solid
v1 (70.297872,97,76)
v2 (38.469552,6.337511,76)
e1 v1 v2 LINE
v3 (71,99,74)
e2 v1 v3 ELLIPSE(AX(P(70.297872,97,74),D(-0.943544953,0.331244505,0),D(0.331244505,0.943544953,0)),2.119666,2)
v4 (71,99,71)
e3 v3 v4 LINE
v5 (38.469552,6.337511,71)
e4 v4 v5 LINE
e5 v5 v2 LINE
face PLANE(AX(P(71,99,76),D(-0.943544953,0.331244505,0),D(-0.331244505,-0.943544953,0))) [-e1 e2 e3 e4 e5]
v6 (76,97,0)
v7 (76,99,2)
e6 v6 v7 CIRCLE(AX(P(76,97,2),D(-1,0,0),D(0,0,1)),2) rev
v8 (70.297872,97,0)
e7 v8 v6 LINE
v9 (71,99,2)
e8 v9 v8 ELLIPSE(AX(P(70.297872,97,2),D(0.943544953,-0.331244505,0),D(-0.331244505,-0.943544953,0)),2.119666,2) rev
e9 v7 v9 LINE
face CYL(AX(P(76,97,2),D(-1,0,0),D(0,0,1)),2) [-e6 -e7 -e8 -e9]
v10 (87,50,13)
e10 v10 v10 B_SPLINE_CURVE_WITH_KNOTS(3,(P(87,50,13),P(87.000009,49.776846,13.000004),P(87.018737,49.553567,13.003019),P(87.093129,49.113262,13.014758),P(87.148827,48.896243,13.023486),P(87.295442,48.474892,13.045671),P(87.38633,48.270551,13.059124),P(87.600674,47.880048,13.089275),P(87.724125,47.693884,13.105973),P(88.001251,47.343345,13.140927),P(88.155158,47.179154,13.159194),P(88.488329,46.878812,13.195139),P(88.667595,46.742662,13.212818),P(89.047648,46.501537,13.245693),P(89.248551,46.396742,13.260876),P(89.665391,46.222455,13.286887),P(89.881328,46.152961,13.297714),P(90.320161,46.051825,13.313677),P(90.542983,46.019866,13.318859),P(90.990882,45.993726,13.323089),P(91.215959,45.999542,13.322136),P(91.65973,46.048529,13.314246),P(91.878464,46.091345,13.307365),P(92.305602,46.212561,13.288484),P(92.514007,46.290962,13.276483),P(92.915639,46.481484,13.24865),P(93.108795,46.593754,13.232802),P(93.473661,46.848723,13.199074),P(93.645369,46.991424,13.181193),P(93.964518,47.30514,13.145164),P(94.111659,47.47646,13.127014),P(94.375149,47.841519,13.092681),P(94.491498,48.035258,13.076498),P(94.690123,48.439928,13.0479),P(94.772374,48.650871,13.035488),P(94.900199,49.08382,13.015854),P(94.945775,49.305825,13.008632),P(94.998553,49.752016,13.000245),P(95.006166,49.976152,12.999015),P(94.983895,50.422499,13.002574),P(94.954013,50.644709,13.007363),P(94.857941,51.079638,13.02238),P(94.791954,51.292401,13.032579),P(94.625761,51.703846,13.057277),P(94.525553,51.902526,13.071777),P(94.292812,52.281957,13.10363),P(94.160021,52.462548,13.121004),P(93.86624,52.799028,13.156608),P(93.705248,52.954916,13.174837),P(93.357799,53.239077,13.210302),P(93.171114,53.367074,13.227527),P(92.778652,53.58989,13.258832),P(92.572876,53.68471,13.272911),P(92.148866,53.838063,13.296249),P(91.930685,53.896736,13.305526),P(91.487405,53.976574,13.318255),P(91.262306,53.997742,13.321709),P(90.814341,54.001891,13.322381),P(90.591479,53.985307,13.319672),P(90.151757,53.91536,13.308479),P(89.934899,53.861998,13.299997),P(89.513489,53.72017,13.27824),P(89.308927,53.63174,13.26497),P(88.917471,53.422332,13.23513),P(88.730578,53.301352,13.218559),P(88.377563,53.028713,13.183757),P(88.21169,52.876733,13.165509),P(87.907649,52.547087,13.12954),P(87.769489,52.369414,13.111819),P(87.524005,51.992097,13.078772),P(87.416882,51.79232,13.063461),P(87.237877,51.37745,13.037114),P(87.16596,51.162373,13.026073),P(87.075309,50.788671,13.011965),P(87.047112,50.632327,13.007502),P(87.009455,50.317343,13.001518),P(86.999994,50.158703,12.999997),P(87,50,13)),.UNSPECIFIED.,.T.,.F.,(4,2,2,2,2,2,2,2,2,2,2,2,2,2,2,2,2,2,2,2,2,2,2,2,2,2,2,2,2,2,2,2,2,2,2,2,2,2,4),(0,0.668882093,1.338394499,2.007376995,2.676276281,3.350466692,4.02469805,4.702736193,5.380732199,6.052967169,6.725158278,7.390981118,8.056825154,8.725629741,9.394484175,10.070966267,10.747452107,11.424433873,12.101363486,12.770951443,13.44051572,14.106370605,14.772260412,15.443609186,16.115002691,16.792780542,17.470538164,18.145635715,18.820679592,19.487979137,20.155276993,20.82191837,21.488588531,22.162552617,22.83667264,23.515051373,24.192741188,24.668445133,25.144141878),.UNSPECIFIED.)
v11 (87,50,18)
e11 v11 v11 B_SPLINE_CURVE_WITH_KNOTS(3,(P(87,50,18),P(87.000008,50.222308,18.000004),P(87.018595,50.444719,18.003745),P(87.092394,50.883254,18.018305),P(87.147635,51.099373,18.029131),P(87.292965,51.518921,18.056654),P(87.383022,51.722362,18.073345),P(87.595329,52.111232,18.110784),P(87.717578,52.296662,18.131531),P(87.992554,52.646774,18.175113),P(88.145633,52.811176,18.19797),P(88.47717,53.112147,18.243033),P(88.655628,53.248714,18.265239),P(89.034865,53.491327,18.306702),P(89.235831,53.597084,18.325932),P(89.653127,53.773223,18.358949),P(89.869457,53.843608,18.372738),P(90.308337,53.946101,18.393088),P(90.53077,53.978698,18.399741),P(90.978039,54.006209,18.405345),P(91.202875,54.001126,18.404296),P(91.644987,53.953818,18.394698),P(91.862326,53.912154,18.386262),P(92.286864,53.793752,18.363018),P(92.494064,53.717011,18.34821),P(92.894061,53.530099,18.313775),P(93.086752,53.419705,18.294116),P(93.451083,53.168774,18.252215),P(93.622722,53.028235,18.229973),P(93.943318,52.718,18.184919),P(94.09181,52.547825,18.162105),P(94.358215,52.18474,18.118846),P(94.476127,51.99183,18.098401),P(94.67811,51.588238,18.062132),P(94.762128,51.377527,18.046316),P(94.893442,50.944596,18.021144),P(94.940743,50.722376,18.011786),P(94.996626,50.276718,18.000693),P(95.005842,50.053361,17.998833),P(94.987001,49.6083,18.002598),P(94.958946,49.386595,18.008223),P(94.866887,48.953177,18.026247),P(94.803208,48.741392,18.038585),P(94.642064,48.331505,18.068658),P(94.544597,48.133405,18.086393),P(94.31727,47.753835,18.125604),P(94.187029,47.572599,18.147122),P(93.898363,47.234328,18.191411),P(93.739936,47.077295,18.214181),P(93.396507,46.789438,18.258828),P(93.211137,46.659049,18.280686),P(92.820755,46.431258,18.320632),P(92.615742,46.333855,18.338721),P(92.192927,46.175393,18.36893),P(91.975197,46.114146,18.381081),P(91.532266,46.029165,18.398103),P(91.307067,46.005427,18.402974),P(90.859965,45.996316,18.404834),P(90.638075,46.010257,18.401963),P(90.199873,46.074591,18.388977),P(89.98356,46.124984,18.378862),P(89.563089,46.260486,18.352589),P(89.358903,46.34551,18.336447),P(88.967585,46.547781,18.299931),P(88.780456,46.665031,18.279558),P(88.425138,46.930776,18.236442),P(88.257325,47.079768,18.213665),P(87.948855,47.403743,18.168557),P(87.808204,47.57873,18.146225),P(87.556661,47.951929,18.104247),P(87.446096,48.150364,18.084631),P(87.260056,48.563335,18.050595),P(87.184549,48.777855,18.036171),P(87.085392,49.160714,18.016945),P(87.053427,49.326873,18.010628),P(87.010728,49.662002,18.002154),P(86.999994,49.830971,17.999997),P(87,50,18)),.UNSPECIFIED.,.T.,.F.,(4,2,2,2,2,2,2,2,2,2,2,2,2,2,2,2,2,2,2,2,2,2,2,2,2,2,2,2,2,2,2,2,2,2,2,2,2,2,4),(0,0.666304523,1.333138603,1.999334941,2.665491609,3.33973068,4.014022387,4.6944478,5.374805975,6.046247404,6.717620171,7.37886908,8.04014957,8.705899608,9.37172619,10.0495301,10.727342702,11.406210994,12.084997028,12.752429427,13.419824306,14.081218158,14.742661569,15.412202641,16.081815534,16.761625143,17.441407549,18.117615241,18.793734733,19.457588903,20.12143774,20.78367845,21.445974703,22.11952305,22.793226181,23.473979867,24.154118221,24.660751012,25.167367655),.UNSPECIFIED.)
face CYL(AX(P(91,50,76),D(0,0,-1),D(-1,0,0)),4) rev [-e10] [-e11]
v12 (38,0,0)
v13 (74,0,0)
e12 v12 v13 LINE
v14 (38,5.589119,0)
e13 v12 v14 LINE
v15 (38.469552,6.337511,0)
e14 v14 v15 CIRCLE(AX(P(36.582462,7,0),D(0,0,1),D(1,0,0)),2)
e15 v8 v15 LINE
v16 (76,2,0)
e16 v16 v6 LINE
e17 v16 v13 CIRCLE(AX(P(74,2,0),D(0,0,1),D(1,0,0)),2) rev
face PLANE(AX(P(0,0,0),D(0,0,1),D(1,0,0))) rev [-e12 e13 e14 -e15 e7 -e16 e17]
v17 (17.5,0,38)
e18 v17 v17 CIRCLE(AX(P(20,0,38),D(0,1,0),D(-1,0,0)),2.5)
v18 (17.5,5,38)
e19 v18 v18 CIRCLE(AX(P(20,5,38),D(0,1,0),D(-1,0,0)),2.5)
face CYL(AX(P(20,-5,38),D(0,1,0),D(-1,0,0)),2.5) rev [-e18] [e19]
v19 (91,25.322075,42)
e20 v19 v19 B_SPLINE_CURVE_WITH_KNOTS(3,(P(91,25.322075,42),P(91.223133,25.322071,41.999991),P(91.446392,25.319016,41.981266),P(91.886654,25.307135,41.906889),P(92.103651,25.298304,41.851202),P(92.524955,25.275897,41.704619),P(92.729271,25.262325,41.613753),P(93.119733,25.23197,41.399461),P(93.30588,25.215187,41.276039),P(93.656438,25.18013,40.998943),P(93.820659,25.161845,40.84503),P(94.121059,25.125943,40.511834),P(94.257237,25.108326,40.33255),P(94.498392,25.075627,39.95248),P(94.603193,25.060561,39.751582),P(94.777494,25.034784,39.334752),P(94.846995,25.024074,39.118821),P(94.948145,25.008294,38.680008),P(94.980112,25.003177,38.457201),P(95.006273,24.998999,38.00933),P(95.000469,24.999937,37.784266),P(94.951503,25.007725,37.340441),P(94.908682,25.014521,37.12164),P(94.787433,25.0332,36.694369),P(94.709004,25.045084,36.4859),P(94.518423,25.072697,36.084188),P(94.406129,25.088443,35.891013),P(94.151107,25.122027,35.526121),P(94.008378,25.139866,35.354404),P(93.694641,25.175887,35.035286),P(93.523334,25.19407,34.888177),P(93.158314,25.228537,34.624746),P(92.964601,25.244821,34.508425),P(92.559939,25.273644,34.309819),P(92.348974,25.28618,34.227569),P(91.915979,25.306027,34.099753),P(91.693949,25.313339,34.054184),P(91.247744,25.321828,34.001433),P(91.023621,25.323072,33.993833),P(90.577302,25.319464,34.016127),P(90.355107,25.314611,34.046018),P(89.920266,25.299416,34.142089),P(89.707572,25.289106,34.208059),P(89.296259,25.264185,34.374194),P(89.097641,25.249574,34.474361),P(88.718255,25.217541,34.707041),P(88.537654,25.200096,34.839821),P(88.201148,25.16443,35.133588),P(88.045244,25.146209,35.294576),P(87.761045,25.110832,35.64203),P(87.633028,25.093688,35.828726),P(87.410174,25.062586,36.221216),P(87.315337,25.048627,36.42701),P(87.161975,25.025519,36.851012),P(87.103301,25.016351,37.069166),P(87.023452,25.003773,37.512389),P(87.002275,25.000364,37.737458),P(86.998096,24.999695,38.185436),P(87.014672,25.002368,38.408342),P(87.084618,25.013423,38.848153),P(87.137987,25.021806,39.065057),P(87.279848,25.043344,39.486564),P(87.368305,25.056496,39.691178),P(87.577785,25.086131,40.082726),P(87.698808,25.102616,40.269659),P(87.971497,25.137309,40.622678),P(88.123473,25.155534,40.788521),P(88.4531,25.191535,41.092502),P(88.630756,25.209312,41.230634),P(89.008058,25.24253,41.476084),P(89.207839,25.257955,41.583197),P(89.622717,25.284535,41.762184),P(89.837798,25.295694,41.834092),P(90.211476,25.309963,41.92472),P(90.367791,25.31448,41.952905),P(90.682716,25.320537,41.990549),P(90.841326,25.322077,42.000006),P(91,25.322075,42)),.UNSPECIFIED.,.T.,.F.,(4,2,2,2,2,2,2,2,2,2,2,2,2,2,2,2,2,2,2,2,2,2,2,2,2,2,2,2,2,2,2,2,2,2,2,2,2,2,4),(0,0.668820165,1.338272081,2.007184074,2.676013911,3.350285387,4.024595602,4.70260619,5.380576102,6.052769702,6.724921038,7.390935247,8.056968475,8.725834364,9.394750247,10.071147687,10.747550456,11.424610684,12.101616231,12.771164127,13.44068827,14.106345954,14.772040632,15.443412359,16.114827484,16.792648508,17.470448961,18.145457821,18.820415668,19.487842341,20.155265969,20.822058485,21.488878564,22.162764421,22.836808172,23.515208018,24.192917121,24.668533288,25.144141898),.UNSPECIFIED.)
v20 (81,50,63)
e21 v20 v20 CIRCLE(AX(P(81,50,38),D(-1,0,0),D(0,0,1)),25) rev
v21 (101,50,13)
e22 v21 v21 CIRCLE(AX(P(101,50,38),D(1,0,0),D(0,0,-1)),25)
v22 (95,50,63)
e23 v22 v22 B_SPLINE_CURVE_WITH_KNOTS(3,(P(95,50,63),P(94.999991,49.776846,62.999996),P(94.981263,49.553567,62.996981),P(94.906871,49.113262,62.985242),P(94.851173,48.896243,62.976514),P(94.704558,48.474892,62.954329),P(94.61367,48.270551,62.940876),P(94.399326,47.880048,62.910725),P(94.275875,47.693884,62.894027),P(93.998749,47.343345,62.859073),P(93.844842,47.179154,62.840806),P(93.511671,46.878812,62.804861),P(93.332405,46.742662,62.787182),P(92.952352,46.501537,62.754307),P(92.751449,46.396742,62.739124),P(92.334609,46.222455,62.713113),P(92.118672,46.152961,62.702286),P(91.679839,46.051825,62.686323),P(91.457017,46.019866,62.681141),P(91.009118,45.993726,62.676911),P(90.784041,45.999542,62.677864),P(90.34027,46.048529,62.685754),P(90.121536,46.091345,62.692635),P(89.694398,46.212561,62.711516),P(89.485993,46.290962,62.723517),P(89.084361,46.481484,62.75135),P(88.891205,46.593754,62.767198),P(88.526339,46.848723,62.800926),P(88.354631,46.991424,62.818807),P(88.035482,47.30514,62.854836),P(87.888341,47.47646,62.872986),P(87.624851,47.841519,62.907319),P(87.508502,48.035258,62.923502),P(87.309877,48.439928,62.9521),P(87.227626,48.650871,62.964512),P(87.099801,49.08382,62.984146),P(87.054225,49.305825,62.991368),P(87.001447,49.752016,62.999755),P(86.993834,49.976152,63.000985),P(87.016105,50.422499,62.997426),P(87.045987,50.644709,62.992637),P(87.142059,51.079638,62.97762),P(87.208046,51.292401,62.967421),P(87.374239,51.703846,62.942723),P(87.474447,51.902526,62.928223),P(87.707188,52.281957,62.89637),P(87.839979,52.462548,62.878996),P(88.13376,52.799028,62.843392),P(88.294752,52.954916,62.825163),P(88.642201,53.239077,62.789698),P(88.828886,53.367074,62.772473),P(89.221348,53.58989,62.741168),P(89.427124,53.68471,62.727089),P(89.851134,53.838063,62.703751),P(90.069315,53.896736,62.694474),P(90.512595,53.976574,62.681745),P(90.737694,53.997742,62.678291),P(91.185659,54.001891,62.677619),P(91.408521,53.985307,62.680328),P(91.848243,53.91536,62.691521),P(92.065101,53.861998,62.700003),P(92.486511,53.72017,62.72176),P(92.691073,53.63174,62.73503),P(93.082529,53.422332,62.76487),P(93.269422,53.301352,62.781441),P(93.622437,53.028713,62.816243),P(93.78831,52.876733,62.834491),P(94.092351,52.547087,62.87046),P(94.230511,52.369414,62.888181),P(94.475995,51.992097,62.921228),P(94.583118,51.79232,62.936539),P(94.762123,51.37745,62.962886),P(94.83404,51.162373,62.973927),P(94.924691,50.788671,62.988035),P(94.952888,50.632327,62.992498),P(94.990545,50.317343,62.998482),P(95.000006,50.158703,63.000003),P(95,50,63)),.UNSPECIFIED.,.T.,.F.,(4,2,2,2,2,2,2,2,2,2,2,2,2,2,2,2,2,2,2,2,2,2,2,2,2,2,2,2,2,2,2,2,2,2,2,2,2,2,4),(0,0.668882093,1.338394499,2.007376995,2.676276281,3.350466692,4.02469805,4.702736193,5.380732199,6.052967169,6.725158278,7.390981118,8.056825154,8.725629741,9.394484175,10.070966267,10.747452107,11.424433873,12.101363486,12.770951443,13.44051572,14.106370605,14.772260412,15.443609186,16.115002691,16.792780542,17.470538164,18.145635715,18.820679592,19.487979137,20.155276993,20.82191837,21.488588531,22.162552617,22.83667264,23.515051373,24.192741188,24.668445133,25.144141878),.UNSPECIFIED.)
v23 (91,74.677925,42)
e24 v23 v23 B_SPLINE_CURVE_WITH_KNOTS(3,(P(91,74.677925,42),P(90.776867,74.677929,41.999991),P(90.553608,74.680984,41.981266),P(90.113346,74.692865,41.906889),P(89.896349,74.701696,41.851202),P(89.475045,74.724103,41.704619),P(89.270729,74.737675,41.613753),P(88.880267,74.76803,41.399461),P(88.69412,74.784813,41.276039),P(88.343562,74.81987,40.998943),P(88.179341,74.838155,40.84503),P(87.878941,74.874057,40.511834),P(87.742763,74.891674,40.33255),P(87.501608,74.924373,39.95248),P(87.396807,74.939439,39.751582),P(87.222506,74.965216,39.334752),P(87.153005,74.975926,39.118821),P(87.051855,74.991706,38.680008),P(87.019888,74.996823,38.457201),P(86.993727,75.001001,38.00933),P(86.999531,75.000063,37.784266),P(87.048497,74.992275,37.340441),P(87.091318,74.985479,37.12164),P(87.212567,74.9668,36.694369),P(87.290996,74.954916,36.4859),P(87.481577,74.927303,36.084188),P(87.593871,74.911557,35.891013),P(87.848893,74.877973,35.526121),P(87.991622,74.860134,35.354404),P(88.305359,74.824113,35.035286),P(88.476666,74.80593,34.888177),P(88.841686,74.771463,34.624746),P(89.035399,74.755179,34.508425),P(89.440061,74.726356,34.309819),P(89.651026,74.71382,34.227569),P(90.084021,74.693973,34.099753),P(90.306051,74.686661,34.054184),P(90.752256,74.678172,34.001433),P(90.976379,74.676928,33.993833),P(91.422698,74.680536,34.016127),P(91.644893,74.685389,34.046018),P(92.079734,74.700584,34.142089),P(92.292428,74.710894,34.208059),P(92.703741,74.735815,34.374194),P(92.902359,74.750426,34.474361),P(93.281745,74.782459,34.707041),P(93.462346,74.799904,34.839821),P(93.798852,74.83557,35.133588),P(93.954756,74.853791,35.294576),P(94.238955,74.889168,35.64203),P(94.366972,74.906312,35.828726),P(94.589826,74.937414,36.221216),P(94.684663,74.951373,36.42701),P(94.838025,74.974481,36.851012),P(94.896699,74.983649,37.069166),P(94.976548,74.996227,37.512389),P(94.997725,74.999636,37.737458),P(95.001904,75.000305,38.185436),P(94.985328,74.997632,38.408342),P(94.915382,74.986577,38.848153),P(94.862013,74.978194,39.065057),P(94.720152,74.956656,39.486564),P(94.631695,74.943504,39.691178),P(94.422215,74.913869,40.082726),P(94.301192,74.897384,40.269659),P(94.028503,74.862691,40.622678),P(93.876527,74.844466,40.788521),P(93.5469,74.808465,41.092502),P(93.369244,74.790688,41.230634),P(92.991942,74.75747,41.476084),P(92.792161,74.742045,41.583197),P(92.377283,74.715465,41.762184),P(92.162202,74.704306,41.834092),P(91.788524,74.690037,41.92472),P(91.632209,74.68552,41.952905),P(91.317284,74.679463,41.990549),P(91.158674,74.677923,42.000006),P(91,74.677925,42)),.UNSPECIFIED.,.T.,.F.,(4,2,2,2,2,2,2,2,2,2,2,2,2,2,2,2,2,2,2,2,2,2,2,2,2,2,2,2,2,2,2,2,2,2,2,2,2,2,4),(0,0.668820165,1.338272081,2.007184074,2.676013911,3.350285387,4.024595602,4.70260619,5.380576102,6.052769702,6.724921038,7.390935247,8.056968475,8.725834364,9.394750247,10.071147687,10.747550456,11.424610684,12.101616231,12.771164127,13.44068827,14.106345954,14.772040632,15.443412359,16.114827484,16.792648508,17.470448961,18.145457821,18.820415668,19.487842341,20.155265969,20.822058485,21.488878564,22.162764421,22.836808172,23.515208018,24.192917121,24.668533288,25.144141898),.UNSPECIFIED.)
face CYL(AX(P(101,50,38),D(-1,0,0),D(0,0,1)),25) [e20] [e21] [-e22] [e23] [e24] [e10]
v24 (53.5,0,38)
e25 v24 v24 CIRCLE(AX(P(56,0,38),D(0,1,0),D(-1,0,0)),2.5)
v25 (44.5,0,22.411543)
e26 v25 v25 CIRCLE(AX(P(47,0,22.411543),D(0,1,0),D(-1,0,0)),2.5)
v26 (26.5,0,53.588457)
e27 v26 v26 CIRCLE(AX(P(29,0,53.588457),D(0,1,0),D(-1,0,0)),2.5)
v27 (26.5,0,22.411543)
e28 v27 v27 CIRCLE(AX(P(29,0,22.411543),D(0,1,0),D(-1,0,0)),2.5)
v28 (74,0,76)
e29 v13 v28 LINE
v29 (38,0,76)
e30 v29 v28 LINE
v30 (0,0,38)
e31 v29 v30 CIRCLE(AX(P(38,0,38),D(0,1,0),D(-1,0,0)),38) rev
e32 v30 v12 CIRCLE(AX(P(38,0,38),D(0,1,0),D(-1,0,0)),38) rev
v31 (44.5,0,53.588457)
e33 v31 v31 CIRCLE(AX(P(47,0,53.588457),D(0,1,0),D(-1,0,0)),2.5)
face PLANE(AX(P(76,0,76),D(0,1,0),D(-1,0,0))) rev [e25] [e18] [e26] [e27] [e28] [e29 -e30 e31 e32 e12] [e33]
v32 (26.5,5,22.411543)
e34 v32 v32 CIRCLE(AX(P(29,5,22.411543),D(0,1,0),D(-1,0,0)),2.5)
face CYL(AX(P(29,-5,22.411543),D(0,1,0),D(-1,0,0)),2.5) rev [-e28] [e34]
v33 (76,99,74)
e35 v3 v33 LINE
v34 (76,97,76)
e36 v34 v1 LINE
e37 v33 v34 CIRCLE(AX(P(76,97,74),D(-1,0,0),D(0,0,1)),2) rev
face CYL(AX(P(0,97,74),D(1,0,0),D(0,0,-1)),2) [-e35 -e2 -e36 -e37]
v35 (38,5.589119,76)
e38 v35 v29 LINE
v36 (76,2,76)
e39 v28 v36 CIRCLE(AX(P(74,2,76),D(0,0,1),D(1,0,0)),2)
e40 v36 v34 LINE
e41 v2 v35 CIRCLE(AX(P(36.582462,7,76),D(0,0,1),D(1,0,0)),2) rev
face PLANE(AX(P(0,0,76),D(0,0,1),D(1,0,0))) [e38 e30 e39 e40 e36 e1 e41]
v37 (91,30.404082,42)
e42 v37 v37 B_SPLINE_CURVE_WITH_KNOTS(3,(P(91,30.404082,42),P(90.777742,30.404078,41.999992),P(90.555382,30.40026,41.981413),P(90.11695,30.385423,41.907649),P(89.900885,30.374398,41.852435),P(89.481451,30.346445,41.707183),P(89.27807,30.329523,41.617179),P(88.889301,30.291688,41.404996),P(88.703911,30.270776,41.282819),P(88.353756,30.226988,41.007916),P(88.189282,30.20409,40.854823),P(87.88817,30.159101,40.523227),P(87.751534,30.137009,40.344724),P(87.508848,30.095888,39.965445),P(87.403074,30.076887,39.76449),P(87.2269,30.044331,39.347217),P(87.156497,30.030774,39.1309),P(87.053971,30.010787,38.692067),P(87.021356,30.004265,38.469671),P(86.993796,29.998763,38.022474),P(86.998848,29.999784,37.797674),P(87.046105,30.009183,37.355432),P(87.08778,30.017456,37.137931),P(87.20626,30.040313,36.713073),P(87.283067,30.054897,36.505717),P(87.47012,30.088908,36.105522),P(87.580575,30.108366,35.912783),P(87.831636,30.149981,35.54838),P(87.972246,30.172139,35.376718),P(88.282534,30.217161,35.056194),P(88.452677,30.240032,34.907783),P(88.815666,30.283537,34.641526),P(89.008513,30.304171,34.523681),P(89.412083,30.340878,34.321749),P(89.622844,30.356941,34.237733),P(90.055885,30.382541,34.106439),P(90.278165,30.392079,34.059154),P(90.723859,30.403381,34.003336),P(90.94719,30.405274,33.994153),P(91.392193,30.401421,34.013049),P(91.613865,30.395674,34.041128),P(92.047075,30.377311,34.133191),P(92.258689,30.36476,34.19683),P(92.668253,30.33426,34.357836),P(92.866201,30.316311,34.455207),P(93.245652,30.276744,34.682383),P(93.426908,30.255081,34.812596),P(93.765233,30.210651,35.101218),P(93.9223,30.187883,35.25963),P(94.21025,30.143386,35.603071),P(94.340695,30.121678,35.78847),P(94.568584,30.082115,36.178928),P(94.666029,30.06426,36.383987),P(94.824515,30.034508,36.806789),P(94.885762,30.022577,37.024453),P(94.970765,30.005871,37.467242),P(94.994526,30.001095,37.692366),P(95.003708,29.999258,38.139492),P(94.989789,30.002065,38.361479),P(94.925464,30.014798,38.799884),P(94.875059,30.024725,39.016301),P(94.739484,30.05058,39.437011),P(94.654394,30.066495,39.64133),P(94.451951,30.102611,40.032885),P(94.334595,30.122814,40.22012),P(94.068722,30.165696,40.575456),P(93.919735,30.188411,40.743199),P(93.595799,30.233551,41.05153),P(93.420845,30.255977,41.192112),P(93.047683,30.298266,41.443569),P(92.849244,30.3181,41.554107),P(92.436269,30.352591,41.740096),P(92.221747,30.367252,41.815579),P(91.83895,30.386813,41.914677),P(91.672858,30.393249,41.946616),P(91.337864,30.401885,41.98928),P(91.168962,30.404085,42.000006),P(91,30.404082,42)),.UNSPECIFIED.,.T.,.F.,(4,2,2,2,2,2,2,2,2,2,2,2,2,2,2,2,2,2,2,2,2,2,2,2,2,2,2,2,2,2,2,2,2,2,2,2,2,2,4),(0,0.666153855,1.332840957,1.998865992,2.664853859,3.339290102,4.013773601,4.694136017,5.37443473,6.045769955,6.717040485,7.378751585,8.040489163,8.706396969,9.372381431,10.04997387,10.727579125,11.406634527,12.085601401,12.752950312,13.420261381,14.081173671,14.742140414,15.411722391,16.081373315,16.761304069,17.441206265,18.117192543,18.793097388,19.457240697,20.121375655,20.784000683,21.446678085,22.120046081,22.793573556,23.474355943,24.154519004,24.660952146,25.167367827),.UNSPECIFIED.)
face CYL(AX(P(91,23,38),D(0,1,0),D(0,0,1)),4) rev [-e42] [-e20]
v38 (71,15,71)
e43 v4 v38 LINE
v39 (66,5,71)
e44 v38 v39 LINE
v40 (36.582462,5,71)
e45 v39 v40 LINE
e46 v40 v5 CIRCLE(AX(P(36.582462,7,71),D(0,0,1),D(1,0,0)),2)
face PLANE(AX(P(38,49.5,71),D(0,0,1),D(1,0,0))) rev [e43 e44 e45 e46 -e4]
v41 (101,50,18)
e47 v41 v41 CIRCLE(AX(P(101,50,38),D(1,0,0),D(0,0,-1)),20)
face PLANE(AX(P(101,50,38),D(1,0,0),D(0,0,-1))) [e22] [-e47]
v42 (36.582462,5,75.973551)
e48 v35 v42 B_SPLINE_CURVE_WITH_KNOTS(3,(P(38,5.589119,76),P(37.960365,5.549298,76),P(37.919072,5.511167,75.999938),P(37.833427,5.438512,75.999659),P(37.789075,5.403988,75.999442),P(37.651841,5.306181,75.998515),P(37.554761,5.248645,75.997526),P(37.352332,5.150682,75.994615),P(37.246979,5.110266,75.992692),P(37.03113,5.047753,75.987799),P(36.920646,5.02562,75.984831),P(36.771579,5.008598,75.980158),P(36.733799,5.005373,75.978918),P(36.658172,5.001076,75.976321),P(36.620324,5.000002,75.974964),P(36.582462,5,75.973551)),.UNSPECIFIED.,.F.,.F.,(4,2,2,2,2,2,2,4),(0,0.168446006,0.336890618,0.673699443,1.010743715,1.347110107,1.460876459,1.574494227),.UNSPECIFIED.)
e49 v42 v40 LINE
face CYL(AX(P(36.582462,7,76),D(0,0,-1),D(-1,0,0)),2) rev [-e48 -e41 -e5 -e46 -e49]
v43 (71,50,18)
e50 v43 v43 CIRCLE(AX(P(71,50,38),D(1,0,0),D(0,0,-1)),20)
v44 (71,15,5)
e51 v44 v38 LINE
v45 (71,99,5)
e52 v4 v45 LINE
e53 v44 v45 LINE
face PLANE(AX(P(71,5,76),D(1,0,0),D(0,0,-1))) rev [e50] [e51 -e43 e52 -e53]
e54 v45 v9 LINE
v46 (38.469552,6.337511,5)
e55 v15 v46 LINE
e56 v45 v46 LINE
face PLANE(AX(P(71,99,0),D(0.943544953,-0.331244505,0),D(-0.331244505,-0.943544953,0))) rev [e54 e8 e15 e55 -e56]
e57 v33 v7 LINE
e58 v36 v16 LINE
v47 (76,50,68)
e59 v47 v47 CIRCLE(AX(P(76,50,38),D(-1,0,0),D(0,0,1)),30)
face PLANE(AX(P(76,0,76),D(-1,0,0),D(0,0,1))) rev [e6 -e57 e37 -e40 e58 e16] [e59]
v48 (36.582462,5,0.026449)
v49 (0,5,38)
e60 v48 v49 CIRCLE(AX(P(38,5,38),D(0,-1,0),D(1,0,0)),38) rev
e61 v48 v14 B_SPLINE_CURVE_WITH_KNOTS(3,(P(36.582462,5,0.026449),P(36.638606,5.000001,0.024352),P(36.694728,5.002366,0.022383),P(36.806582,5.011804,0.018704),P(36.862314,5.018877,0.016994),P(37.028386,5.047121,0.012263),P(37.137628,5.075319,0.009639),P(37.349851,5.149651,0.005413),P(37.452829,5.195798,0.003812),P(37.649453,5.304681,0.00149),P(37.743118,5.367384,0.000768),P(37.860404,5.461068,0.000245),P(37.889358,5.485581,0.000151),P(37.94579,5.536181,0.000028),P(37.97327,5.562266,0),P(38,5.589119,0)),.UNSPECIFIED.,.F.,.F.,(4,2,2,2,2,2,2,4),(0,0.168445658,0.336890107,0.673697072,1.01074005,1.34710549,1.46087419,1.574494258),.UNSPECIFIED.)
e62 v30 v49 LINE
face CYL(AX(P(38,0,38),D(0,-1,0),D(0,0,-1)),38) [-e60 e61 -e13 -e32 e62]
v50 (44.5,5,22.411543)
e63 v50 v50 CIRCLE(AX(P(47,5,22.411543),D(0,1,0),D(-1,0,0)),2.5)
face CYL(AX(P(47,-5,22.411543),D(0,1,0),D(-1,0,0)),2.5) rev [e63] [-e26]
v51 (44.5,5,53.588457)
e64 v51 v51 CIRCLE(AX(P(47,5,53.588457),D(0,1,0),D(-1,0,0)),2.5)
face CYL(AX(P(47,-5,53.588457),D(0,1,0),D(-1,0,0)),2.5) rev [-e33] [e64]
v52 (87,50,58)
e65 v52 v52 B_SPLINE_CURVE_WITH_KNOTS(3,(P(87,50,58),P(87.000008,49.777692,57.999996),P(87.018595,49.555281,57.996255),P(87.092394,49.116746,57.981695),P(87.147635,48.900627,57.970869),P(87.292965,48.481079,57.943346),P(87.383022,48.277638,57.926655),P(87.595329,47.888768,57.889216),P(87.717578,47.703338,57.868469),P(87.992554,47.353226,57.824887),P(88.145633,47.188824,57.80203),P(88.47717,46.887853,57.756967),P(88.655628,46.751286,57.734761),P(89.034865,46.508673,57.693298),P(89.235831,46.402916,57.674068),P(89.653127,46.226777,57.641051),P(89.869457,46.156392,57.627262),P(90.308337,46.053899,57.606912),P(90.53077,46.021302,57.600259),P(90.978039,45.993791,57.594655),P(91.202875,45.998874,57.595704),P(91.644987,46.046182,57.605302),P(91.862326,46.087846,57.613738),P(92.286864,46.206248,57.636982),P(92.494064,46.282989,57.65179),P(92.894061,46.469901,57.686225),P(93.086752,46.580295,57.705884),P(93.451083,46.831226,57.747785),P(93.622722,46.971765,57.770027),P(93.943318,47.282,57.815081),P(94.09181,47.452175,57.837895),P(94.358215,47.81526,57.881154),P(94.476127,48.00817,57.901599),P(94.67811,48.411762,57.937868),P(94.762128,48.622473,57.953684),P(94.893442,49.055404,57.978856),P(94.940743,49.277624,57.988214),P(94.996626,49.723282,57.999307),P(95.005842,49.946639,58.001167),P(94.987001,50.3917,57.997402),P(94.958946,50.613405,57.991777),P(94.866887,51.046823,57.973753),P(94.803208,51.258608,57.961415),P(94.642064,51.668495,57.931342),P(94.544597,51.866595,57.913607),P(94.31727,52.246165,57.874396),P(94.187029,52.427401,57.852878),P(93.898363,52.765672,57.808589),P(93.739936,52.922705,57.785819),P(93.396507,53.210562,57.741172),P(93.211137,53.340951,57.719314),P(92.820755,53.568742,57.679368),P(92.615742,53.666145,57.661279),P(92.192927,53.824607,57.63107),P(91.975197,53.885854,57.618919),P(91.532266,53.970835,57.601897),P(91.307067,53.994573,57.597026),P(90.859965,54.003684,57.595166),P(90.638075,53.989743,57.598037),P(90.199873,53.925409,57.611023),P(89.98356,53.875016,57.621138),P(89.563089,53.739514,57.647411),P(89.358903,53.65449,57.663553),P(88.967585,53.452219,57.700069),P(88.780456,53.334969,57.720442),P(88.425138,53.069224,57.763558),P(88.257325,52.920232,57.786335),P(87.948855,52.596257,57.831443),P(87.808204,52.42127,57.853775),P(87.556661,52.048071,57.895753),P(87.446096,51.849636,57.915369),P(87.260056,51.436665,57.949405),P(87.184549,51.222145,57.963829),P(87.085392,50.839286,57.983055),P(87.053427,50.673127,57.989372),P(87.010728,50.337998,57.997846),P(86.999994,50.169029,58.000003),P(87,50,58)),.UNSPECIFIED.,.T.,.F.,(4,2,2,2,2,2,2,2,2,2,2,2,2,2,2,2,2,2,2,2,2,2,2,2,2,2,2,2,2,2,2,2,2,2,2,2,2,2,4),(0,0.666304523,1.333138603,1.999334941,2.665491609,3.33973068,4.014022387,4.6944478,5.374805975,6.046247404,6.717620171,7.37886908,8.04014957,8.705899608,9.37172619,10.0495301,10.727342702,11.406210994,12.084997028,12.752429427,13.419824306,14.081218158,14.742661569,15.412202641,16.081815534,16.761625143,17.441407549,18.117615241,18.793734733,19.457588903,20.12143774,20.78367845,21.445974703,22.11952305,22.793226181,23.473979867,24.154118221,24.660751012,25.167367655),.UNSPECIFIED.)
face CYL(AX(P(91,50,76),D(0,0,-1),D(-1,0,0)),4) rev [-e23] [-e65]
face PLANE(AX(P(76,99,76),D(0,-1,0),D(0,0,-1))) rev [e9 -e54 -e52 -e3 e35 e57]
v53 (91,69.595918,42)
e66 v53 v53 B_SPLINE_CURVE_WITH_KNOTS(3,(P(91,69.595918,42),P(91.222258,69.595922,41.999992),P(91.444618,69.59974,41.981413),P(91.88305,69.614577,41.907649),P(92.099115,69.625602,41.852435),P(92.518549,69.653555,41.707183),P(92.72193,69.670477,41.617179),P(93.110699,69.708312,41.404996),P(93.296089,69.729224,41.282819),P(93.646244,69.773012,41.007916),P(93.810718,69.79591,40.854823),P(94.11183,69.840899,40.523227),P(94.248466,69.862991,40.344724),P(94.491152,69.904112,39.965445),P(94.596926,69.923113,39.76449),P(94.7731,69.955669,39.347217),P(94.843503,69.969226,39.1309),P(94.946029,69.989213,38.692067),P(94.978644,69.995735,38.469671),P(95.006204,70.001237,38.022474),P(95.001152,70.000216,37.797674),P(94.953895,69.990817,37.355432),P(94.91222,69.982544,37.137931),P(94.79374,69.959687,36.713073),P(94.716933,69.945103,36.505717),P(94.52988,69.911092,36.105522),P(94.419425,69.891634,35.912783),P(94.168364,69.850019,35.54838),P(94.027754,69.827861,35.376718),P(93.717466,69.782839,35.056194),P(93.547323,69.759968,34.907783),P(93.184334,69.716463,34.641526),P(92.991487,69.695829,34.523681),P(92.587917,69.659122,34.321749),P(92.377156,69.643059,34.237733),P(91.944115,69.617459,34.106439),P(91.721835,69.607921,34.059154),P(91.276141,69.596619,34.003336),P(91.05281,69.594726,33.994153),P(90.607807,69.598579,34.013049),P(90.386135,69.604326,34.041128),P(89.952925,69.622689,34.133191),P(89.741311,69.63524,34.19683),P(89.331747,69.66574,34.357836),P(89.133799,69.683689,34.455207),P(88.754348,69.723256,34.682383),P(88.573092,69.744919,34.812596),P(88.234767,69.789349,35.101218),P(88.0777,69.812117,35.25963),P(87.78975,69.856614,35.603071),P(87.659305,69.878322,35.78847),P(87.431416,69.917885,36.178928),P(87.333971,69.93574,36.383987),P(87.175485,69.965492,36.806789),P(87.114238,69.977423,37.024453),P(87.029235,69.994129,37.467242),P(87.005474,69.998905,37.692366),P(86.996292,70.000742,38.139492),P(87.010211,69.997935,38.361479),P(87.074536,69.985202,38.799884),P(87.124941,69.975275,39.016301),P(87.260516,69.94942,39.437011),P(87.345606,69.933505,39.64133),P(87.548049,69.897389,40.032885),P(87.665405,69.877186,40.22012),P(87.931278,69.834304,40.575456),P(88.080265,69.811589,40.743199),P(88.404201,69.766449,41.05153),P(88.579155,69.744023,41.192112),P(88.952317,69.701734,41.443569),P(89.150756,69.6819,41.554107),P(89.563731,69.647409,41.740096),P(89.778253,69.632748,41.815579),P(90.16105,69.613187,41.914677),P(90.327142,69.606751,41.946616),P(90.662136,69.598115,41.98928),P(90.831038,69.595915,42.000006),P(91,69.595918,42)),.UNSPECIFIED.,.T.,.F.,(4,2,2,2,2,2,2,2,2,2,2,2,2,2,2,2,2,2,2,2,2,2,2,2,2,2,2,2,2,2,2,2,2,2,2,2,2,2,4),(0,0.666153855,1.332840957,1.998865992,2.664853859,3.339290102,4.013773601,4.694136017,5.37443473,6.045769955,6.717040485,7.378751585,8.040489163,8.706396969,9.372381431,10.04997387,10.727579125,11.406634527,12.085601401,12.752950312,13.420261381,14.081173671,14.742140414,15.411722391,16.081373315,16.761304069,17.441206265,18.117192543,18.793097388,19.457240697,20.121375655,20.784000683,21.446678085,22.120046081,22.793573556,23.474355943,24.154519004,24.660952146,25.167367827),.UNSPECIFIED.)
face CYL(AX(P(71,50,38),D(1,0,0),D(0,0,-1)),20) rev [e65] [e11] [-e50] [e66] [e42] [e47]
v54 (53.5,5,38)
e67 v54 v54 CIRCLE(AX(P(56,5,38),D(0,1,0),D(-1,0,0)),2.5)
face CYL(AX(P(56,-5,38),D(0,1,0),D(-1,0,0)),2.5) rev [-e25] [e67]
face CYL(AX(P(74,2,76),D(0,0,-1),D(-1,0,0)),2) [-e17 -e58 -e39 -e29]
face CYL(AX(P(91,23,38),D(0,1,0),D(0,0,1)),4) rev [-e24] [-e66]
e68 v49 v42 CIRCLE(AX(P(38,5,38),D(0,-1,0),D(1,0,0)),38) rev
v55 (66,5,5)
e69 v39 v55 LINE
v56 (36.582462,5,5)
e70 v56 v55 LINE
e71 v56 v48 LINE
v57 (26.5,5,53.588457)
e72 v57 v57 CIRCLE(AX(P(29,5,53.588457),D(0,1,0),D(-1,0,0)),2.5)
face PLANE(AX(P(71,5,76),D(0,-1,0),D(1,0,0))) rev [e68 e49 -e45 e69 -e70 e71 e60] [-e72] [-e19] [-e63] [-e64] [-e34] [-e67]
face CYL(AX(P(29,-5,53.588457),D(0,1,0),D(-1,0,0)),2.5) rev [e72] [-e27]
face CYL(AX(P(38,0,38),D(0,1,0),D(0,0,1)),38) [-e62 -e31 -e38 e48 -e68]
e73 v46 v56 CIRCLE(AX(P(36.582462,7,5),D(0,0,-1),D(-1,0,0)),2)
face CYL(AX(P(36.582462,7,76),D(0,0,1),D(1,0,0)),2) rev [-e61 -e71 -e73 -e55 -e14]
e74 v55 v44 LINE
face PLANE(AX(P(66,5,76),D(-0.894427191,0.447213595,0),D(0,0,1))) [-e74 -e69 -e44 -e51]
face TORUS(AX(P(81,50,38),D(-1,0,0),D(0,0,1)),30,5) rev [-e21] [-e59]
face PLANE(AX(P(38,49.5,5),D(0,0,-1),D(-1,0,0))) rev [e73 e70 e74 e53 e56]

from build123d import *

# Parameters (mm, degrees)
EXTRUDE_1_DEPTH     = 76
FILLET_1_R          = 38
RIB_1_REACH         = 148.127
SKETCH_4_WALL_W     = 393.877609006
SKETCH_4_WALL_H     = 5
RIB_START           = -5
RIB_2_DEPTH         = 5
SKETCH_7_R          = 2.5
CUT_EXTRUDE_1_DEPTH = 10
FILLET_2_R          = 2
CHAMFER_1_SIZE      = 10
CHAMFER_1_SIZE2     = 5
FILLET_3_R          = 2
FILLET_4_R          = 2
SKETCH_8_R          = 20
CUT_EXTRUDE_2_DEPTH = 5
EXTRUDE_START       = 25
SKETCH_8_6_R        = 25
SKETCH_8_6_R_2      = 20
EXTRUDE_4_DEPTH     = 25
FILLET_5_R          = 5
SKETCH_13_R         = 4
CUT_EXTRUDE_3_DEPTH = 76
SKETCH_14_R         = 4
CUT_EXTRUDE_4_DEPTH = 76


with BuildPart() as part:
    # Эскиз3 → Бобышка-Вытянуть1 (new body)
    with BuildSketch(Plane.XY):
        Polygon((76, 0), (0, 0), (0, 5), (71, 5), (71, 99), (76, 99), align=None)
    extrude(amount=EXTRUDE_1_DEPTH)

    # Скругление1
    fillet_1_edges = [part.edges().sort_by_distance(p)[0] for p in [
        (0, 2.5, 0),
        (0, 2.5, 76),
    ]]
    fillet(fillet_1_edges, radius=FILLET_1_R - 0.0001)  # a hair under: the kernel refuses the full size

    # Эскиз4 wall → Ребро1 (add, up to next)
    with BuildSketch(Plane(origin=(54.5, 52, 76), x_dir=(-0.331244504731, -0.94354495287, 0), z_dir=(0.94354495287, -0.331244504731, 0)), mode=Mode.PRIVATE) as rib_1_sk1:
        with Locations((0, 2.5)):
            Rectangle(SKETCH_4_WALL_W, SKETCH_4_WALL_H)
    rib_1_tool1 = extrude(rib_1_sk1.sketch, amount=RIB_1_REACH, mode=Mode.PRIVATE) - part.part
    add(rib_1_tool1.solids().sort_by_distance((54.5, 52, 76))[0])

    # Ребро2: read off the stored shape, not the designer's step
    # Ребро2 outline → Ребро2 (add)
    with BuildSketch(Plane(origin=(0, 0, 0), x_dir=(-1, 0, 0), z_dir=(0, 0, -1)).offset(RIB_START)):
        Polygon((-38, 5), (-71, 99), (-71, 5), align=None)
    extrude(amount=RIB_2_DEPTH)

    # Эскиз7 → Вырез-Вытянуть1 (cut)
    with BuildSketch(Plane(origin=(0, 5, 0), x_dir=(1, 0, 0), z_dir=(0, 1, 0))):
        with Locations(Location((20, -38, 0), (0, 0, 180))):
            Circle(SKETCH_7_R)
        with Locations(Location((29, -22.411542732, 0), (0, 0, 180))):
            Circle(SKETCH_7_R)
        with Locations(Location((47, -22.411542732, 0), (0, 0, 180))):
            Circle(SKETCH_7_R)
        with Locations(Location((56, -38, 0), (0, 0, 180))):
            Circle(SKETCH_7_R)
        with Locations(Location((47, -53.588457268, 0), (0, 0, 180))):
            Circle(SKETCH_7_R)
        with Locations(Location((29, -53.588457268, 0), (0, 0, 180))):
            Circle(SKETCH_7_R)
    extrude(amount=-CUT_EXTRUDE_1_DEPTH, mode=Mode.SUBTRACT)

    # Скругление2
    fillet_2_edges = [part.edges().sort_by_distance(p)[0] for p in [
        (76, 0, 38),
    ]]
    fillet(fillet_2_edges, radius=FILLET_2_R)

    # Фаска1
    chamfer_1_edges = [part.edges().sort_by_distance(p)[0] for p in [
        (71, 5, 38),
    ]]
    chamfer_1_side = [part.faces().sort_by_distance(p)[0] for p in [
        (71, 52, 38),
    ]]
    chamfer(chamfer_1_edges, length=CHAMFER_1_SIZE, length2=CHAMFER_1_SIZE2, reference=chamfer_1_side[0])

    # Скругление3
    fillet_3_edges = [part.edges().sort_by_distance(p)[0] for p in [
        (38, 5, 73.5),
        (38, 5, 2.5),
    ]]
    fillet(fillet_3_edges, radius=FILLET_3_R)

    # Скругление4
    fillet_4_edges = [part.edges().sort_by_distance(p)[0] for p in [
        (73.5, 99, 76),
        (73.5, 99, 0),
    ]]
    fillet(fillet_4_edges, radius=FILLET_4_R)

    # Эскиз8 → Вырез-Вытянуть2 (cut)
    with BuildSketch(Plane(origin=(76, 0, 0), x_dir=(0, 0, -1), z_dir=(1, 0, 0))):
        with Locations((-38, 50)):
            Circle(SKETCH_8_R)
    extrude(amount=-CUT_EXTRUDE_2_DEPTH, mode=Mode.SUBTRACT)

    # Эскиз8<6> → Бобышка-Вытянуть4 (add)
    with BuildSketch(Plane(origin=(76, 0, 0), x_dir=(0, 0, -1), z_dir=(1, 0, 0)).offset(EXTRUDE_START)):
        with Locations(Location((-38, 50, 0), (0, 0, 180))):
            Circle(SKETCH_8_6_R)
        with Locations((-38, 50)):
            Circle(SKETCH_8_6_R_2, mode=Mode.SUBTRACT)
    extrude(amount=-EXTRUDE_4_DEPTH)

    # Скругление5
    fillet_5_edges = [part.edges().sort_by_distance(p)[0] for p in [
        (76, 50, 13),
    ]]
    fillet(fillet_5_edges, radius=FILLET_5_R)

    # Эскиз13 → Вырез-Вытянуть3 (cut)
    with BuildSketch(Plane(origin=(0, 0, 0), x_dir=(-1, 0, 0), z_dir=(0, 0, -1))):
        with Locations((-91, 50)):
            Circle(SKETCH_13_R)
    extrude(amount=-CUT_EXTRUDE_3_DEPTH, mode=Mode.SUBTRACT)

    # Эскиз14 → Вырез-Вытянуть4 (cut)
    with BuildSketch(Plane(origin=(0, 99, 0), x_dir=(1, 0, 0), z_dir=(0, 1, 0))):
        with Locations(Location((91, -38, 0), (0, 0, 270))):
            Circle(SKETCH_14_R)
    extrude(amount=-CUT_EXTRUDE_4_DEPTH, mode=Mode.SUBTRACT)


solid = part.part
